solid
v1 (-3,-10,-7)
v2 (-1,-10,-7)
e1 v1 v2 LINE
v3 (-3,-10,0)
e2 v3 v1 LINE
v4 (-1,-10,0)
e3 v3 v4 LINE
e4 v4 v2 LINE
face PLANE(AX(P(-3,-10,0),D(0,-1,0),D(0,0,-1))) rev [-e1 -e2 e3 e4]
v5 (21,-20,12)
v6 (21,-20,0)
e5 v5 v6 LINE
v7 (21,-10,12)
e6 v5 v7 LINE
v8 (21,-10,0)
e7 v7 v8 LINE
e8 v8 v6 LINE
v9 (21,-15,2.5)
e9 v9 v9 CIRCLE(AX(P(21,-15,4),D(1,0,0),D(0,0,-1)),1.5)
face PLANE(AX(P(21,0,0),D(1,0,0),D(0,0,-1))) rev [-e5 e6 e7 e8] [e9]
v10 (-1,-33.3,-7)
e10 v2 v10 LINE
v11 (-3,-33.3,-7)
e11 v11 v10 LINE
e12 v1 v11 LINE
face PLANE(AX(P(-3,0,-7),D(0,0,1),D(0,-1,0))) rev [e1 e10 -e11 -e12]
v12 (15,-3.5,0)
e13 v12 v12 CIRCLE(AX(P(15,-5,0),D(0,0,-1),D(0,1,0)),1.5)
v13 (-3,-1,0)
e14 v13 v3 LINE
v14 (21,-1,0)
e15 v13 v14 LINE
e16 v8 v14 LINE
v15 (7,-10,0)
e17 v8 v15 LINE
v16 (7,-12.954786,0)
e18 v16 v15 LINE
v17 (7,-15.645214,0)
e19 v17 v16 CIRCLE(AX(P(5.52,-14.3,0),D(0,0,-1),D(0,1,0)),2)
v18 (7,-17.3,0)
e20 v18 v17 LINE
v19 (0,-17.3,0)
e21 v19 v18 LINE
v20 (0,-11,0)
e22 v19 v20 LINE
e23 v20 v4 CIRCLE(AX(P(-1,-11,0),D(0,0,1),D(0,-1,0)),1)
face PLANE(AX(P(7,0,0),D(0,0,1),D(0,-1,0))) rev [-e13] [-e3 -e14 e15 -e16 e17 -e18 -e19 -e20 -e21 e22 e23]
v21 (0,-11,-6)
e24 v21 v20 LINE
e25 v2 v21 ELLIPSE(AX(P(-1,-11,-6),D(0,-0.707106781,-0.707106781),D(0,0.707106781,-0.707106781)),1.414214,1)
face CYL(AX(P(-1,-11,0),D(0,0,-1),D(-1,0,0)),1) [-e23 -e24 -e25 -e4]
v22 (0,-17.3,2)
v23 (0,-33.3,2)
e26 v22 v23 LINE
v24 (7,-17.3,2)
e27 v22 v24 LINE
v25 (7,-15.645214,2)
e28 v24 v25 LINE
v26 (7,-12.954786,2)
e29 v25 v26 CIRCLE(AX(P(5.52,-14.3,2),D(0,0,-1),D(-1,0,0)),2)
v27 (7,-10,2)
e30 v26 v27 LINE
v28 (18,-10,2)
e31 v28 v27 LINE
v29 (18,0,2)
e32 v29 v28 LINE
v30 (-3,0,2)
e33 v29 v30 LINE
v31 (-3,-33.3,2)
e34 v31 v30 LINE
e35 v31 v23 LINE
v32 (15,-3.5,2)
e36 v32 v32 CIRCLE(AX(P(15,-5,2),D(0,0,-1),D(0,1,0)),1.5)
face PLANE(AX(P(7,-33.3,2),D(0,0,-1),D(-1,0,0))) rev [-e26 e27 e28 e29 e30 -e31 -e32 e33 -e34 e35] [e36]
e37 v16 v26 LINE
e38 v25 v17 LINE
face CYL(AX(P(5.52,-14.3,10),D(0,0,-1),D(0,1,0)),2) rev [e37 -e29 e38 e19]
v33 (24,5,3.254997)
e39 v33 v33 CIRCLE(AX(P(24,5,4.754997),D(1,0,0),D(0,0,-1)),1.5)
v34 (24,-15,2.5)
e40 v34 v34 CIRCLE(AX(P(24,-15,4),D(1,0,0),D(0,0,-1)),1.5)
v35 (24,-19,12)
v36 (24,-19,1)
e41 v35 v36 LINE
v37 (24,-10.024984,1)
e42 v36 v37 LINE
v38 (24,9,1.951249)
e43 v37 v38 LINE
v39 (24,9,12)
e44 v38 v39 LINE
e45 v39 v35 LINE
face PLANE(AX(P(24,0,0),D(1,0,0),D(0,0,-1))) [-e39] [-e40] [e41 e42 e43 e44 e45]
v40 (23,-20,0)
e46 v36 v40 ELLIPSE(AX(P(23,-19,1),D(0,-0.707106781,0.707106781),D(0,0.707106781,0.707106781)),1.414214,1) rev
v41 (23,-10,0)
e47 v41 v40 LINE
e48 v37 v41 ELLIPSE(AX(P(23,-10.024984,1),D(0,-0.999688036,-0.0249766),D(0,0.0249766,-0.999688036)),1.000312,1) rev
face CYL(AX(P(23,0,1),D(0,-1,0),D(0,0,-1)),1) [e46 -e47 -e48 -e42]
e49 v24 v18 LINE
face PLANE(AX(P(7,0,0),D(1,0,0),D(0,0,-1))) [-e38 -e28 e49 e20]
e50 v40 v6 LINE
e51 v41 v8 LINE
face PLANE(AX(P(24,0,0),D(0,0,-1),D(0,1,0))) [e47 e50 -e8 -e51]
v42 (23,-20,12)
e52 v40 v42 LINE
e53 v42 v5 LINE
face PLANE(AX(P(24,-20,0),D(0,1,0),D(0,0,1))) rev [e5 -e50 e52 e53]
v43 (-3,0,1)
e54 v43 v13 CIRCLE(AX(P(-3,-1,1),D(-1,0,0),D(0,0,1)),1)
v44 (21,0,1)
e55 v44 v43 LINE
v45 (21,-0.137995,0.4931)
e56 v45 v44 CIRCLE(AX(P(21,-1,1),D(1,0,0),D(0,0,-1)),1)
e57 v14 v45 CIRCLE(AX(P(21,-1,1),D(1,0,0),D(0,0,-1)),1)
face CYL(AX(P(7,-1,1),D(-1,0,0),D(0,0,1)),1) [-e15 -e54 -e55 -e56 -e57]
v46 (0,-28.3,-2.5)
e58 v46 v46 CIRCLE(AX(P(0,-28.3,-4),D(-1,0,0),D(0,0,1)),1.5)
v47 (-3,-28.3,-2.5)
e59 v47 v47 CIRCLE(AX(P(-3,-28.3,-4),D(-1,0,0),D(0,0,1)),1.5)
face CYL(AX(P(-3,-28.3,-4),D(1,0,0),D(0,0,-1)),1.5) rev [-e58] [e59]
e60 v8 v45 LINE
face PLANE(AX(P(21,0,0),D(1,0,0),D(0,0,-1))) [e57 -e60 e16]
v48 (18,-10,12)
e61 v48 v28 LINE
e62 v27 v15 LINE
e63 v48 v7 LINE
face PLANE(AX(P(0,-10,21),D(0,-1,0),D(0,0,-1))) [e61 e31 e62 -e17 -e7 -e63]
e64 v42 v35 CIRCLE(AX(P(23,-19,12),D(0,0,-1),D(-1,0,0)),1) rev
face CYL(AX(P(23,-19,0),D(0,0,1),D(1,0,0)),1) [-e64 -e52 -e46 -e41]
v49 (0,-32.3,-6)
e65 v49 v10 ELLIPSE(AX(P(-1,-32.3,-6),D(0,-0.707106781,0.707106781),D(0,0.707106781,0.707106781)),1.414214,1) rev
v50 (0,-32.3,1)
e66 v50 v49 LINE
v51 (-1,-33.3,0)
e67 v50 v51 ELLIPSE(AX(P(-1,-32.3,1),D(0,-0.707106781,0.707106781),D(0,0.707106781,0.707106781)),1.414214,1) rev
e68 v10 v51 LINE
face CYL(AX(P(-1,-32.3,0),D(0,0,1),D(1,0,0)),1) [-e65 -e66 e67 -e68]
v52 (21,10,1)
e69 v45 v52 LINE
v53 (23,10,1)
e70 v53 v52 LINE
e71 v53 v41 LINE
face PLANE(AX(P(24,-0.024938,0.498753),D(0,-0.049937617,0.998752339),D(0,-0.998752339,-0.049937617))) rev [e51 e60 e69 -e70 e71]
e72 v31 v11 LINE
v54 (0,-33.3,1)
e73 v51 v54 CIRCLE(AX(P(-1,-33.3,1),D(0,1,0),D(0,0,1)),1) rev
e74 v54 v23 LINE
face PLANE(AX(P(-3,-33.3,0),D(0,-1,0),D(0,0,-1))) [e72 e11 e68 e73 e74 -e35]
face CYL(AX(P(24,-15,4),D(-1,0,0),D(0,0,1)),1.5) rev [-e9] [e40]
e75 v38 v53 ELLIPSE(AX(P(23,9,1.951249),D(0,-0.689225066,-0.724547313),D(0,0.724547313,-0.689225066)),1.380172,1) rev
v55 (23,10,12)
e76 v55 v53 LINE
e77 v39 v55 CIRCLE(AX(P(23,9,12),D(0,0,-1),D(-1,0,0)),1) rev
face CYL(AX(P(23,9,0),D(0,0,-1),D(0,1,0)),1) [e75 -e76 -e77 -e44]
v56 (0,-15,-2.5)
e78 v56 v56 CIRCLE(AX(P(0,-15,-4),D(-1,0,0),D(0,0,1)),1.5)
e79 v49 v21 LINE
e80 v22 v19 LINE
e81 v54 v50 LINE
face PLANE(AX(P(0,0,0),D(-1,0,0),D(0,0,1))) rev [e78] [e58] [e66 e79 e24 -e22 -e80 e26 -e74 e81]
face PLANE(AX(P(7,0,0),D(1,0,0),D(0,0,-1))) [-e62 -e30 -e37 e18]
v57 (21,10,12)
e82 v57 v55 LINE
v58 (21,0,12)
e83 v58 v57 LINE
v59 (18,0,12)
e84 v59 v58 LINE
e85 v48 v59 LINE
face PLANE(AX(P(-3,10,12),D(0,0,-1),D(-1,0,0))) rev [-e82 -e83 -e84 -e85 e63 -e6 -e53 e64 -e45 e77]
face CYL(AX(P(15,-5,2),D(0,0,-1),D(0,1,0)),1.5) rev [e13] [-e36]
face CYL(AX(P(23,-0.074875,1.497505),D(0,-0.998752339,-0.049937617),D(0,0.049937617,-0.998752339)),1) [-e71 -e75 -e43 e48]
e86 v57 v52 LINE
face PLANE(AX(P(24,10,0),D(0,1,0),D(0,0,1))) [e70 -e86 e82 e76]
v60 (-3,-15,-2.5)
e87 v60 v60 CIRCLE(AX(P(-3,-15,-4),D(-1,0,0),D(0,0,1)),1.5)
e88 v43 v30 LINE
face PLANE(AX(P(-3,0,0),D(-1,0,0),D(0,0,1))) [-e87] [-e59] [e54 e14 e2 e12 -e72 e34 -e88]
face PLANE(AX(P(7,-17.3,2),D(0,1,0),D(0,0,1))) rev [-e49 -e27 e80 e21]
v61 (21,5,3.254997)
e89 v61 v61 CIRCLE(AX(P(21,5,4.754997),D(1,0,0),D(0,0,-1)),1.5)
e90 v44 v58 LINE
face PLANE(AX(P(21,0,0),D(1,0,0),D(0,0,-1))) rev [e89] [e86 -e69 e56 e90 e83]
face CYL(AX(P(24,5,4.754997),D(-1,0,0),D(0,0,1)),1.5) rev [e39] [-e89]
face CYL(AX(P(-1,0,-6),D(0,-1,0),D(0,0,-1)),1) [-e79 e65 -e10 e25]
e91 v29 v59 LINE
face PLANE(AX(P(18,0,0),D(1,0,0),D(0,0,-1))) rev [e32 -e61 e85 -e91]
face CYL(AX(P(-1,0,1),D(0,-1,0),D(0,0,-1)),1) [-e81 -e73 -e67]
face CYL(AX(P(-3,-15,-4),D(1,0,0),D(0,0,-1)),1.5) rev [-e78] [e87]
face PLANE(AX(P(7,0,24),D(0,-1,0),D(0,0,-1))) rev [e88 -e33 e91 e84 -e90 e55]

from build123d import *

# Parameters (mm, degrees)
CROQUIS1_W              = 24
CROQUIS1_H              = 33.3
SALIENTE_EXTRUIR2_DEPTH = 7
CROQUIS3_W              = 4
CROQUIS3_H              = 19
CORTAR_EXTRUIR1_DEPTH   = 42.640004803
CROQUIS7_R              = 1.5
SALIENTE_EXTRUIR3_DEPTH = 3
CROQUIS8_W              = 18
CROQUIS8_H              = 10
CROQUIS8_R              = 1.5
SALIENTE_EXTRUIR5_DEPTH = 3
SALIENTE_EXTRUIR6_START = -2
CROQUIS9_W              = 18
CROQUIS9_H              = 10
CROQUIS9_R              = 1.5
SALIENTE_EXTRUIR6_DEPTH = 2
CROQUIS10_W             = 24
CROQUIS10_H             = 10
SALIENTE_EXTRUIR7_DEPTH = 3
CROQUIS11_W             = 19
CROQUIS11_H             = 38
CORTAR_EXTRUIR5_DEPTH   = 57.986752847
CROQUIS15_W             = 7
CROQUIS15_H             = 10
CORTAR_EXTRUIR8_DEPTH   = 59.004223984
CROQUIS16_W             = 7
CROQUIS16_H             = 16
CORTAR_EXTRUIR9_DEPTH   = 2
CROQUIS18_R             = 1.5
CROQUIS18_W             = 24
CROQUIS18_H             = 10
SALIENTE_EXTRUIR8_DEPTH = 3
REDONDEO1_R             = 1
CROQUIS19_W             = 27
CROQUIS19_H             = 19
CORTAR_EXTRUIR11_DEPTH  = 67.973800848
CROQUIS21_R             = 2
CORTAR_EXTRUIR12_DEPTH  = 10
CROQUIS22_W             = 12
CROQUIS22_H             = 11
CORTAR_EXTRUIR13_DEPTH  = 52.792760112


with BuildPart() as part:
    # Croquis1 → Saliente-Extruir2 (new body)
    with BuildSketch(Plane(origin=(0, 0, 0), x_dir=(0, 0, -1), z_dir=(1, 0, 0))):
        with Locations((-12, -16.65)):
            Rectangle(CROQUIS1_W, CROQUIS1_H)
    extrude(amount=SALIENTE_EXTRUIR2_DEPTH)

    # Croquis3 → Cortar-Extruir1 (cut, through all)
    with BuildSketch(Plane(origin=(0, 0, 0), x_dir=(1, 0, 0), z_dir=(0, 1, 0))):
        with Locations((5, -11.5)):
            Rectangle(CROQUIS3_W, CROQUIS3_H)
    extrude(amount=-CORTAR_EXTRUIR1_DEPTH, mode=Mode.SUBTRACT)



with BuildPart() as body_2:
    # Croquis7 → Saliente-Extruir3 (new body)
    with BuildSketch(Plane.ZY):
        Polygon((-7, 0), (-7, -33.3), (0, -33.3), (0, -44.3), (24, -44.3), (24, -33.3), (31, -33.3), (31, 0), align=None)
        with Locations((-4, -28.3)):
            Circle(CROQUIS7_R, mode=Mode.SUBTRACT)
        with Locations((-4, -15)):
            Circle(CROQUIS7_R, mode=Mode.SUBTRACT)
        with Locations((28, -15)):
            Circle(CROQUIS7_R, mode=Mode.SUBTRACT)
        with Locations((28, -28.3)):
            Circle(CROQUIS7_R, mode=Mode.SUBTRACT)
        with Locations((20, -40.3)):
            Circle(CROQUIS7_R, mode=Mode.SUBTRACT)
        with Locations((4, -40.3)):
            Circle(CROQUIS7_R, mode=Mode.SUBTRACT)
    extrude(amount=SALIENTE_EXTRUIR3_DEPTH)


with BuildPart() as part_1:
    add(part.part)

    add(body_2.part)  # Saliente-Extruir5 merges body 2
    # Croquis8 → Saliente-Extruir5 (add)
    with BuildSketch(Plane.XY.offset(24)):
        with Locations((9, -5)):
            Rectangle(CROQUIS8_W, CROQUIS8_H)
        with Locations((15, -5)):
            Circle(CROQUIS8_R, mode=Mode.SUBTRACT)
        with Locations((3, -5)):
            Circle(CROQUIS8_R, mode=Mode.SUBTRACT)
    extrude(amount=-SALIENTE_EXTRUIR5_DEPTH)

    # Croquis9 → Saliente-Extruir6 (add)
    with BuildSketch(Plane(origin=(0, 0, 0), x_dir=(-1, 0, 0), z_dir=(0, 0, -1)).offset(SALIENTE_EXTRUIR6_START)):
        with Locations((-9, -5)):
            Rectangle(CROQUIS9_W, CROQUIS9_H)
        with Locations(Location((-15, -5, 0), (0, 0, 180))):
            Circle(CROQUIS9_R, mode=Mode.SUBTRACT)
    extrude(amount=SALIENTE_EXTRUIR6_DEPTH)

    # Croquis10 → Saliente-Extruir7 (add)
    with BuildSketch(Plane(origin=(18, 0, 0), x_dir=(0, 0, -1), z_dir=(1, 0, 0))):
        with Locations((-12, -5)):
            Rectangle(CROQUIS10_W, CROQUIS10_H)
    extrude(amount=SALIENTE_EXTRUIR7_DEPTH)

    # Croquis11 → Cortar-Extruir5 (cut, through all)
    with BuildSketch(Plane(origin=(3, 0, 0), x_dir=(0, 0, -1), z_dir=(1, 0, 0))):
        with Locations((-11.5, -19)):
            Rectangle(CROQUIS11_W, CROQUIS11_H)
    extrude(amount=-CORTAR_EXTRUIR5_DEPTH, mode=Mode.SUBTRACT)

    # Croquis15 → Cortar-Extruir8 (cut, through all)
    with BuildSketch(Plane(origin=(0, 0, 0), x_dir=(0, 0, -1), z_dir=(1, 0, 0))):
        with Locations((-27.5, -5)):
            Rectangle(CROQUIS15_W, CROQUIS15_H)
        with Locations((3.5, -5)):
            Rectangle(CROQUIS15_W, CROQUIS15_H)
    extrude(amount=-CORTAR_EXTRUIR8_DEPTH, mode=Mode.SUBTRACT)

    # Croquis16 → Cortar-Extruir9 (cut)
    with BuildSketch(Plane(origin=(0, 0, 0), x_dir=(-1, 0, 0), z_dir=(0, 0, -1))):
        with Locations((-3.5, -25.3)):
            Rectangle(CROQUIS16_W, CROQUIS16_H)
    extrude(amount=-CORTAR_EXTRUIR9_DEPTH, mode=Mode.SUBTRACT)

    # Croquis18 → Saliente-Extruir8 (add)
    # profile 1 of 2: a face of its own
    with BuildSketch(Plane(origin=(21, 0, 0), x_dir=(0, 0, -1), z_dir=(1, 0, 0))):
        Polygon((-24, 10), (-24, -10), (0, -10), (-1, 10), align=None)
        with Locations((-20, 5)):
            Circle(CROQUIS18_R, mode=Mode.SUBTRACT)
        with Locations((-4.754996879, 5)):
            Circle(CROQUIS18_R, mode=Mode.SUBTRACT)
    # profile 2 of 2: a face of its own
    with BuildSketch(Plane(origin=(21, 0, 0), x_dir=(0, 0, -1), z_dir=(1, 0, 0))):
        with Locations((-12, -15)):
            Rectangle(CROQUIS18_W, CROQUIS18_H)
        with Locations((-20, -15)):
            Circle(CROQUIS18_R, mode=Mode.SUBTRACT)
        with Locations((-4, -15)):
            Circle(CROQUIS18_R, mode=Mode.SUBTRACT)
    extrude(amount=SALIENTE_EXTRUIR8_DEPTH)

    # Redondeo1
    # the kernel refuses this fillet: 1 mm, written as the material it takes off along each edge
    with BuildSketch(Plane(origin=(0, -33.3, 31), x_dir=(0, 0, -1), z_dir=(0, 1, 0)), Plane(origin=(0, -10, -7), x_dir=(0, 0, 1), z_dir=(0, -1, 0))) as redondeo1_piece_1:
        with BuildLine():
            CenterArc((REDONDEO1_R, REDONDEO1_R), REDONDEO1_R, 180, 90)
            Line((0, REDONDEO1_R), (-REDONDEO1_R * 0.02, REDONDEO1_R))
            Line((-REDONDEO1_R * 0.02, REDONDEO1_R), (-REDONDEO1_R * 0.02, -REDONDEO1_R * 0.02))
            Line((-REDONDEO1_R * 0.02, -REDONDEO1_R * 0.02), (REDONDEO1_R, -REDONDEO1_R * 0.02))
            Line((REDONDEO1_R, -REDONDEO1_R * 0.02), (REDONDEO1_R, 0))
        make_face()
    extrude(amount=23.3, mode=Mode.SUBTRACT)
    with BuildSketch(Plane(origin=(0, -10, 24), x_dir=(-1, 0, 0), z_dir=(0, 0, 1)), Plane(origin=(0, -10, -7), x_dir=(-1, 0, 0), z_dir=(0, 0, 1)), Plane(origin=(0, -33.3, 24), x_dir=(0, 1, 0), z_dir=(0, 0, 1)), Plane(origin=(0, -33.3, -7), x_dir=(0, 1, 0), z_dir=(0, 0, 1))) as redondeo1_piece_2:
        with BuildLine():
            CenterArc((REDONDEO1_R, REDONDEO1_R), REDONDEO1_R, 180, 90)
            Line((0, REDONDEO1_R), (-REDONDEO1_R * 0.02, REDONDEO1_R))
            Line((-REDONDEO1_R * 0.02, REDONDEO1_R), (-REDONDEO1_R * 0.02, -REDONDEO1_R * 0.02))
            Line((-REDONDEO1_R * 0.02, -REDONDEO1_R * 0.02), (REDONDEO1_R, -REDONDEO1_R * 0.02))
            Line((REDONDEO1_R, -REDONDEO1_R * 0.02), (REDONDEO1_R, 0))
        make_face()
    extrude(amount=7, mode=Mode.SUBTRACT)
    with BuildSketch(Plane(origin=(24, -20, 24), x_dir=(-1, 0, 0), z_dir=(0, 1, 0))) as redondeo1_piece_3:
        with BuildLine():
            CenterArc((REDONDEO1_R, -REDONDEO1_R), REDONDEO1_R, 90, 90)
            Line((0, -REDONDEO1_R), (-REDONDEO1_R * 0.02, -REDONDEO1_R))
            Line((-REDONDEO1_R * 0.02, -REDONDEO1_R), (-REDONDEO1_R * 0.02, REDONDEO1_R * 0.02))
            Line((-REDONDEO1_R * 0.02, REDONDEO1_R * 0.02), (REDONDEO1_R, REDONDEO1_R * 0.02))
            Line((REDONDEO1_R, REDONDEO1_R * 0.02), (REDONDEO1_R, 0))
        make_face()
    extrude(amount=30, mode=Mode.SUBTRACT)
    with BuildSketch(Plane(origin=(24, -20, 0), x_dir=(0, 0, 1), z_dir=(0, 1, 0))) as redondeo1_piece_4_section:
        with BuildLine():
            CenterArc((REDONDEO1_R, -REDONDEO1_R), REDONDEO1_R, 90, 90)
            Line((0, -REDONDEO1_R), (-REDONDEO1_R * 0.02, -REDONDEO1_R))
            Line((-REDONDEO1_R * 0.02, -REDONDEO1_R), (-REDONDEO1_R * 0.02, REDONDEO1_R * 0.02))
            Line((-REDONDEO1_R * 0.02, REDONDEO1_R * 0.02), (REDONDEO1_R, REDONDEO1_R * 0.02))
            Line((REDONDEO1_R, REDONDEO1_R * 0.02), (REDONDEO1_R, 0))
        make_face()
    redondeo1_piece_4 = extrude(amount=12.5, mode=Mode.PRIVATE)
    redondeo1_piece_4 = split(redondeo1_piece_4, bisect_by=Plane(origin=(23.783903018, -14.02846616, -0.201423308), z_dir=(0, -0.049937616943892635, 0.9987523388778446)), keep=Keep.TOP, mode=Mode.PRIVATE)
    add(redondeo1_piece_4, mode=Mode.SUBTRACT)
    with BuildSketch(Plane(origin=(24, 10, -1.5), x_dir=(-1, 0, 0), z_dir=(0, 0, 1))) as redondeo1_piece_5_section:
        with BuildLine():
            CenterArc((REDONDEO1_R, REDONDEO1_R), REDONDEO1_R, 180, 90)
            Line((0, REDONDEO1_R), (-REDONDEO1_R * 0.02, REDONDEO1_R))
            Line((-REDONDEO1_R * 0.02, REDONDEO1_R), (-REDONDEO1_R * 0.02, -REDONDEO1_R * 0.02))
            Line((-REDONDEO1_R * 0.02, -REDONDEO1_R * 0.02), (REDONDEO1_R, -REDONDEO1_R * 0.02))
            Line((REDONDEO1_R, -REDONDEO1_R * 0.02), (REDONDEO1_R, 0))
        make_face()
    redondeo1_piece_5 = extrude(amount=25.5, mode=Mode.PRIVATE)
    redondeo1_piece_5 = split(redondeo1_piece_5, bisect_by=Plane(origin=(23.773664545, 10.347352398, 1.01736762), z_dir=(0, -0.049937616943892635, 0.9987523388778446)), keep=Keep.TOP, mode=Mode.PRIVATE)
    add(redondeo1_piece_5, mode=Mode.SUBTRACT)
    with BuildSketch(Plane(origin=(24, -20, 24), x_dir=(0, 1, 0), z_dir=(0, 0, -1)), Plane(origin=(-3, 0, 24), x_dir=(0, 0, -1), z_dir=(1, 0, 0)), Plane(origin=(21, 0, 0), x_dir=(0, 0, 1), z_dir=(-1, 0, 0))) as redondeo1_piece_6:
        with BuildLine():
            CenterArc((REDONDEO1_R, -REDONDEO1_R), REDONDEO1_R, 90, 90)
            Line((0, -REDONDEO1_R), (-REDONDEO1_R * 0.02, -REDONDEO1_R))
            Line((-REDONDEO1_R * 0.02, -REDONDEO1_R), (-REDONDEO1_R * 0.02, REDONDEO1_R * 0.02))
            Line((-REDONDEO1_R * 0.02, REDONDEO1_R * 0.02), (REDONDEO1_R, REDONDEO1_R * 0.02))
            Line((REDONDEO1_R, REDONDEO1_R * 0.02), (REDONDEO1_R, 0))
        make_face()
    extrude(amount=24, mode=Mode.SUBTRACT)
    with BuildSketch(Plane(origin=(24, -12.496880847, -0.124844042), x_dir=(-1, 0, 0), z_dir=(0, 0.9987523388778446, 0.049937616943892635))) as redondeo1_piece_7_section:
        with BuildLine():
            CenterArc((REDONDEO1_R, REDONDEO1_R), REDONDEO1_R, 180, 90)
            Line((0, REDONDEO1_R), (-REDONDEO1_R * 0.02, REDONDEO1_R))
            Line((-REDONDEO1_R * 0.02, REDONDEO1_R), (-REDONDEO1_R * 0.02, -REDONDEO1_R * 0.02))
            Line((-REDONDEO1_R * 0.02, -REDONDEO1_R * 0.02), (REDONDEO1_R, -REDONDEO1_R * 0.02))
            Line((REDONDEO1_R, -REDONDEO1_R * 0.02), (REDONDEO1_R, 0))
        make_face()
    redondeo1_piece_7 = extrude(amount=25.024984395, mode=Mode.PRIVATE)
    redondeo1_piece_7 = split(redondeo1_piece_7, bisect_by=Plane(origin=(23.779237021, -0.936247577, 0), z_dir=(0, 0, 1)), keep=Keep.TOP, mode=Mode.PRIVATE)
    redondeo1_piece_7 = split(redondeo1_piece_7, bisect_by=Plane(origin=(23.779237021, 10, 0.686324779), z_dir=(0, -1, 0)), keep=Keep.TOP, mode=Mode.PRIVATE)
    add(redondeo1_piece_7, mode=Mode.SUBTRACT)
    with BuildSketch(Plane(origin=(7, -33.3, 24), x_dir=(-1, 0, 0), z_dir=(0, 1, 0))) as redondeo1_piece_8:
        with BuildLine():
            CenterArc((REDONDEO1_R, -REDONDEO1_R), REDONDEO1_R, 90, 90)
            Line((0, -REDONDEO1_R), (-REDONDEO1_R * 0.02, -REDONDEO1_R))
            Line((-REDONDEO1_R * 0.02, -REDONDEO1_R), (-REDONDEO1_R * 0.02, REDONDEO1_R * 0.02))
            Line((-REDONDEO1_R * 0.02, REDONDEO1_R * 0.02), (REDONDEO1_R, REDONDEO1_R * 0.02))
            Line((REDONDEO1_R, REDONDEO1_R * 0.02), (REDONDEO1_R, 0))
        make_face()
    extrude(amount=23.3, mode=Mode.SUBTRACT)
    with BuildSketch(Plane(origin=(7, -10, 24), x_dir=(0, 1, 0), z_dir=(1, 0, 0))) as redondeo1_piece_9:
        with BuildLine():
            CenterArc((REDONDEO1_R, -REDONDEO1_R), REDONDEO1_R, 90, 90)
            Line((0, -REDONDEO1_R), (-REDONDEO1_R * 0.02, -REDONDEO1_R))
            Line((-REDONDEO1_R * 0.02, -REDONDEO1_R), (-REDONDEO1_R * 0.02, REDONDEO1_R * 0.02))
            Line((-REDONDEO1_R * 0.02, REDONDEO1_R * 0.02), (REDONDEO1_R, REDONDEO1_R * 0.02))
            Line((REDONDEO1_R, REDONDEO1_R * 0.02), (REDONDEO1_R, 0))
        make_face()
    extrude(amount=14, mode=Mode.SUBTRACT)
    with BuildSketch(Plane(origin=(0, -33.3, 0), x_dir=(0, 0, 1), z_dir=(0, -1, 0))) as redondeo1_piece_10:
        with BuildLine():
            CenterArc((REDONDEO1_R, REDONDEO1_R), REDONDEO1_R, 180, 90)
            Line((0, REDONDEO1_R), (-REDONDEO1_R * 0.02, REDONDEO1_R))
            Line((-REDONDEO1_R * 0.02, REDONDEO1_R), (-REDONDEO1_R * 0.02, -REDONDEO1_R * 0.02))
            Line((-REDONDEO1_R * 0.02, -REDONDEO1_R * 0.02), (REDONDEO1_R, -REDONDEO1_R * 0.02))
            Line((REDONDEO1_R, -REDONDEO1_R * 0.02), (REDONDEO1_R, 0))
        make_face()
    extrude(amount=11, mode=Mode.SUBTRACT)
    with BuildSketch(Plane(origin=(0, -44.3, 0), x_dir=(0, 1, 0), z_dir=(0, 0, 1))) as redondeo1_piece_11:
        with BuildLine():
            CenterArc((REDONDEO1_R, REDONDEO1_R), REDONDEO1_R, 180, 90)
            Line((0, REDONDEO1_R), (-REDONDEO1_R * 0.02, REDONDEO1_R))
            Line((-REDONDEO1_R * 0.02, REDONDEO1_R), (-REDONDEO1_R * 0.02, -REDONDEO1_R * 0.02))
            Line((-REDONDEO1_R * 0.02, -REDONDEO1_R * 0.02), (REDONDEO1_R, -REDONDEO1_R * 0.02))
            Line((REDONDEO1_R, -REDONDEO1_R * 0.02), (REDONDEO1_R, 0))
        make_face()
    extrude(amount=24, mode=Mode.SUBTRACT)
    with BuildSketch(Plane(origin=(0, -35.8, 31), x_dir=(0, 0, -1), z_dir=(0, 1, 0))) as redondeo1_piece_12a_section:
        with BuildLine():
            CenterArc((REDONDEO1_R, REDONDEO1_R), REDONDEO1_R, 180, 90)
            Line((0, REDONDEO1_R), (-REDONDEO1_R * 0.02, REDONDEO1_R))
            Line((-REDONDEO1_R * 0.02, REDONDEO1_R), (-REDONDEO1_R * 0.02, -REDONDEO1_R * 0.02))
            Line((-REDONDEO1_R * 0.02, -REDONDEO1_R * 0.02), (REDONDEO1_R, -REDONDEO1_R * 0.02))
            Line((REDONDEO1_R, -REDONDEO1_R * 0.02), (REDONDEO1_R, 0))
        make_face()
    redondeo1_piece_12a = extrude(amount=25.8, mode=Mode.PRIVATE)
    redondeo1_piece_12a = split(redondeo1_piece_12a, bisect_by=Plane(origin=(-0.226395114, -33.3, 30.773604886), z_dir=(0, -1, 0)), keep=Keep.TOP, mode=Mode.PRIVATE)
    with BuildSketch(Plane(origin=(0, -33.3, 24), x_dir=(0, 1, 0), z_dir=(0, 0, 1))) as redondeo1_piece_12b_section:
        with BuildLine():
            CenterArc((REDONDEO1_R, REDONDEO1_R), REDONDEO1_R, 180, 90)
            Line((0, REDONDEO1_R), (-REDONDEO1_R * 0.02, REDONDEO1_R))
            Line((-REDONDEO1_R * 0.02, REDONDEO1_R), (-REDONDEO1_R * 0.02, -REDONDEO1_R * 0.02))
            Line((-REDONDEO1_R * 0.02, -REDONDEO1_R * 0.02), (REDONDEO1_R, -REDONDEO1_R * 0.02))
            Line((REDONDEO1_R, -REDONDEO1_R * 0.02), (REDONDEO1_R, 0))
        make_face()
    redondeo1_piece_12b = extrude(amount=9.5, mode=Mode.PRIVATE)
    redondeo1_piece_12b = split(redondeo1_piece_12b, bisect_by=Plane(origin=(-0.226395114, -33.073604886, 31), z_dir=(0, 0, 1)), keep=Keep.TOP, mode=Mode.PRIVATE)
    redondeo1_piece_12 = redondeo1_piece_12a & redondeo1_piece_12b
    add(redondeo1_piece_12, mode=Mode.SUBTRACT)
    with BuildSketch(Plane(origin=(0, -10, 24), x_dir=(-1, 0, 0), z_dir=(0, 0, 1))) as redondeo1_piece_13a_section:
        with BuildLine():
            CenterArc((REDONDEO1_R, REDONDEO1_R), REDONDEO1_R, 180, 90)
            Line((0, REDONDEO1_R), (-REDONDEO1_R * 0.02, REDONDEO1_R))
            Line((-REDONDEO1_R * 0.02, REDONDEO1_R), (-REDONDEO1_R * 0.02, -REDONDEO1_R * 0.02))
            Line((-REDONDEO1_R * 0.02, -REDONDEO1_R * 0.02), (REDONDEO1_R, -REDONDEO1_R * 0.02))
            Line((REDONDEO1_R, -REDONDEO1_R * 0.02), (REDONDEO1_R, 0))
        make_face()
    redondeo1_piece_13a = extrude(amount=9.5, mode=Mode.PRIVATE)
    redondeo1_piece_13a = split(redondeo1_piece_13a, bisect_by=Plane(origin=(-0.226395114, -10.226395114, 31), z_dir=(0, 0, 1)), keep=Keep.TOP, mode=Mode.PRIVATE)
    with BuildSketch(Plane(origin=(0, -33.3, 31), x_dir=(0, 0, -1), z_dir=(0, 1, 0))) as redondeo1_piece_13b_section:
        with BuildLine():
            CenterArc((REDONDEO1_R, REDONDEO1_R), REDONDEO1_R, 180, 90)
            Line((0, REDONDEO1_R), (-REDONDEO1_R * 0.02, REDONDEO1_R))
            Line((-REDONDEO1_R * 0.02, REDONDEO1_R), (-REDONDEO1_R * 0.02, -REDONDEO1_R * 0.02))
            Line((-REDONDEO1_R * 0.02, -REDONDEO1_R * 0.02), (REDONDEO1_R, -REDONDEO1_R * 0.02))
            Line((REDONDEO1_R, -REDONDEO1_R * 0.02), (REDONDEO1_R, 0))
        make_face()
    redondeo1_piece_13b = extrude(amount=25.8, mode=Mode.PRIVATE)
    redondeo1_piece_13b = split(redondeo1_piece_13b, bisect_by=Plane(origin=(-0.226395114, -10, 30.773604886), z_dir=(0, 1, 0)), keep=Keep.TOP, mode=Mode.PRIVATE)
    redondeo1_piece_13 = redondeo1_piece_13a & redondeo1_piece_13b
    add(redondeo1_piece_13, mode=Mode.SUBTRACT)
    with BuildSketch(Plane(origin=(0, -10, -9.5), x_dir=(-1, 0, 0), z_dir=(0, 0, 1))) as redondeo1_piece_14a_section:
        with BuildLine():
            CenterArc((REDONDEO1_R, REDONDEO1_R), REDONDEO1_R, 180, 90)
            Line((0, REDONDEO1_R), (-REDONDEO1_R * 0.02, REDONDEO1_R))
            Line((-REDONDEO1_R * 0.02, REDONDEO1_R), (-REDONDEO1_R * 0.02, -REDONDEO1_R * 0.02))
            Line((-REDONDEO1_R * 0.02, -REDONDEO1_R * 0.02), (REDONDEO1_R, -REDONDEO1_R * 0.02))
            Line((REDONDEO1_R, -REDONDEO1_R * 0.02), (REDONDEO1_R, 0))
        make_face()
    redondeo1_piece_14a = extrude(amount=9.5, mode=Mode.PRIVATE)
    redondeo1_piece_14a = split(redondeo1_piece_14a, bisect_by=Plane(origin=(-0.226395114, -10.226395114, -7), z_dir=(0, 0, -1)), keep=Keep.TOP, mode=Mode.PRIVATE)
    with BuildSketch(Plane(origin=(0, -7.5, -7), x_dir=(0, 0, 1), z_dir=(0, -1, 0))) as redondeo1_piece_14b_section:
        with BuildLine():
            CenterArc((REDONDEO1_R, REDONDEO1_R), REDONDEO1_R, 180, 90)
            Line((0, REDONDEO1_R), (-REDONDEO1_R * 0.02, REDONDEO1_R))
            Line((-REDONDEO1_R * 0.02, REDONDEO1_R), (-REDONDEO1_R * 0.02, -REDONDEO1_R * 0.02))
            Line((-REDONDEO1_R * 0.02, -REDONDEO1_R * 0.02), (REDONDEO1_R, -REDONDEO1_R * 0.02))
            Line((REDONDEO1_R, -REDONDEO1_R * 0.02), (REDONDEO1_R, 0))
        make_face()
    redondeo1_piece_14b = extrude(amount=25.8, mode=Mode.PRIVATE)
    redondeo1_piece_14b = split(redondeo1_piece_14b, bisect_by=Plane(origin=(-0.226395114, -10, -6.773604886), z_dir=(0, 1, 0)), keep=Keep.TOP, mode=Mode.PRIVATE)
    redondeo1_piece_14 = redondeo1_piece_14a & redondeo1_piece_14b
    add(redondeo1_piece_14, mode=Mode.SUBTRACT)
    with BuildSketch(Plane(origin=(0, -10, -7), x_dir=(0, 0, 1), z_dir=(0, -1, 0))) as redondeo1_piece_15a_section:
        with BuildLine():
            CenterArc((REDONDEO1_R, REDONDEO1_R), REDONDEO1_R, 180, 90)
            Line((0, REDONDEO1_R), (-REDONDEO1_R * 0.02, REDONDEO1_R))
            Line((-REDONDEO1_R * 0.02, REDONDEO1_R), (-REDONDEO1_R * 0.02, -REDONDEO1_R * 0.02))
            Line((-REDONDEO1_R * 0.02, -REDONDEO1_R * 0.02), (REDONDEO1_R, -REDONDEO1_R * 0.02))
            Line((REDONDEO1_R, -REDONDEO1_R * 0.02), (REDONDEO1_R, 0))
        make_face()
    redondeo1_piece_15a = extrude(amount=25.8, mode=Mode.PRIVATE)
    redondeo1_piece_15a = split(redondeo1_piece_15a, bisect_by=Plane(origin=(-0.226395114, -33.3, -6.773604886), z_dir=(0, -1, 0)), keep=Keep.TOP, mode=Mode.PRIVATE)
    with BuildSketch(Plane(origin=(0, -33.3, -9.5), x_dir=(0, 1, 0), z_dir=(0, 0, 1))) as redondeo1_piece_15b_section:
        with BuildLine():
            CenterArc((REDONDEO1_R, REDONDEO1_R), REDONDEO1_R, 180, 90)
            Line((0, REDONDEO1_R), (-REDONDEO1_R * 0.02, REDONDEO1_R))
            Line((-REDONDEO1_R * 0.02, REDONDEO1_R), (-REDONDEO1_R * 0.02, -REDONDEO1_R * 0.02))
            Line((-REDONDEO1_R * 0.02, -REDONDEO1_R * 0.02), (REDONDEO1_R, -REDONDEO1_R * 0.02))
            Line((REDONDEO1_R, -REDONDEO1_R * 0.02), (REDONDEO1_R, 0))
        make_face()
    redondeo1_piece_15b = extrude(amount=9.5, mode=Mode.PRIVATE)
    redondeo1_piece_15b = split(redondeo1_piece_15b, bisect_by=Plane(origin=(-0.226395114, -33.073604886, -7), z_dir=(0, 0, -1)), keep=Keep.TOP, mode=Mode.PRIVATE)
    redondeo1_piece_15 = redondeo1_piece_15a & redondeo1_piece_15b
    add(redondeo1_piece_15, mode=Mode.SUBTRACT)
    with BuildSketch(Plane(origin=(24, -22.5, 24), x_dir=(-1, 0, 0), z_dir=(0, 1, 0))) as redondeo1_piece_16a_section:
        with BuildLine():
            CenterArc((REDONDEO1_R, -REDONDEO1_R), REDONDEO1_R, 90, 90)
            Line((0, -REDONDEO1_R), (-REDONDEO1_R * 0.02, -REDONDEO1_R))
            Line((-REDONDEO1_R * 0.02, -REDONDEO1_R), (-REDONDEO1_R * 0.02, REDONDEO1_R * 0.02))
            Line((-REDONDEO1_R * 0.02, REDONDEO1_R * 0.02), (REDONDEO1_R, REDONDEO1_R * 0.02))
            Line((REDONDEO1_R, REDONDEO1_R * 0.02), (REDONDEO1_R, 0))
        make_face()
    redondeo1_piece_16a = extrude(amount=32.5, mode=Mode.PRIVATE)
    redondeo1_piece_16a = split(redondeo1_piece_16a, bisect_by=Plane(origin=(23.773604886, -20, 23.773604886), z_dir=(0, -1, 0)), keep=Keep.TOP, mode=Mode.PRIVATE)
    with BuildSketch(Plane(origin=(24, -20, 26.5), x_dir=(0, 1, 0), z_dir=(0, 0, -1))) as redondeo1_piece_16b_section:
        with BuildLine():
            CenterArc((REDONDEO1_R, -REDONDEO1_R), REDONDEO1_R, 90, 90)
            Line((0, -REDONDEO1_R), (-REDONDEO1_R * 0.02, -REDONDEO1_R))
            Line((-REDONDEO1_R * 0.02, -REDONDEO1_R), (-REDONDEO1_R * 0.02, REDONDEO1_R * 0.02))
            Line((-REDONDEO1_R * 0.02, REDONDEO1_R * 0.02), (REDONDEO1_R, REDONDEO1_R * 0.02))
            Line((REDONDEO1_R, REDONDEO1_R * 0.02), (REDONDEO1_R, 0))
        make_face()
    redondeo1_piece_16b = extrude(amount=26.5, mode=Mode.PRIVATE)
    redondeo1_piece_16b = split(redondeo1_piece_16b, bisect_by=Plane(origin=(23.773604886, -19.773604886, 24), z_dir=(0, 0, 1)), keep=Keep.TOP, mode=Mode.PRIVATE)
    redondeo1_piece_16 = redondeo1_piece_16a & redondeo1_piece_16b
    add(redondeo1_piece_16, mode=Mode.SUBTRACT)
    with BuildSketch(Plane(origin=(24, -20, 24), x_dir=(-1, 0, 0), z_dir=(0, 1, 0))) as redondeo1_piece_17a_section:
        with BuildLine():
            CenterArc((REDONDEO1_R, -REDONDEO1_R), REDONDEO1_R, 90, 90)
            Line((0, -REDONDEO1_R), (-REDONDEO1_R * 0.02, -REDONDEO1_R))
            Line((-REDONDEO1_R * 0.02, -REDONDEO1_R), (-REDONDEO1_R * 0.02, REDONDEO1_R * 0.02))
            Line((-REDONDEO1_R * 0.02, REDONDEO1_R * 0.02), (REDONDEO1_R, REDONDEO1_R * 0.02))
            Line((REDONDEO1_R, REDONDEO1_R * 0.02), (REDONDEO1_R, 0))
        make_face()
    redondeo1_piece_17a = extrude(amount=32.5, mode=Mode.PRIVATE)
    redondeo1_piece_17a = split(redondeo1_piece_17a, bisect_by=Plane(origin=(23.773604886, 10, 23.773604886), z_dir=(0, 1, 0)), keep=Keep.TOP, mode=Mode.PRIVATE)
    with BuildSketch(Plane(origin=(24, 10, -1.5), x_dir=(-1, 0, 0), z_dir=(0, 0, 1))) as redondeo1_piece_17b_section:
        with BuildLine():
            CenterArc((REDONDEO1_R, REDONDEO1_R), REDONDEO1_R, 180, 90)
            Line((0, REDONDEO1_R), (-REDONDEO1_R * 0.02, REDONDEO1_R))
            Line((-REDONDEO1_R * 0.02, REDONDEO1_R), (-REDONDEO1_R * 0.02, -REDONDEO1_R * 0.02))
            Line((-REDONDEO1_R * 0.02, -REDONDEO1_R * 0.02), (REDONDEO1_R, -REDONDEO1_R * 0.02))
            Line((REDONDEO1_R, -REDONDEO1_R * 0.02), (REDONDEO1_R, 0))
        make_face()
    redondeo1_piece_17b = extrude(amount=28, mode=Mode.PRIVATE)
    redondeo1_piece_17b = split(redondeo1_piece_17b, bisect_by=Plane(origin=(23.773604886, 9.773604886, 24), z_dir=(0, 0, 1)), keep=Keep.TOP, mode=Mode.PRIVATE)
    redondeo1_piece_17 = redondeo1_piece_17a & redondeo1_piece_17b
    add(redondeo1_piece_17, mode=Mode.SUBTRACT)
    with BuildSketch(Plane(origin=(24, -20, 24), x_dir=(0, 1, 0), z_dir=(0, 0, -1))) as redondeo1_piece_18a_section:
        with BuildLine():
            CenterArc((REDONDEO1_R, -REDONDEO1_R), REDONDEO1_R, 90, 90)
            Line((0, -REDONDEO1_R), (-REDONDEO1_R * 0.02, -REDONDEO1_R))
            Line((-REDONDEO1_R * 0.02, -REDONDEO1_R), (-REDONDEO1_R * 0.02, REDONDEO1_R * 0.02))
            Line((-REDONDEO1_R * 0.02, REDONDEO1_R * 0.02), (REDONDEO1_R, REDONDEO1_R * 0.02))
            Line((REDONDEO1_R, REDONDEO1_R * 0.02), (REDONDEO1_R, 0))
        make_face()
    redondeo1_piece_18a = extrude(amount=26.5, mode=Mode.PRIVATE)
    redondeo1_piece_18a = split(redondeo1_piece_18a, bisect_by=Plane(origin=(23.773604886, -19.773604886, 0), z_dir=(0, 0, -1)), keep=Keep.TOP, mode=Mode.PRIVATE)
    with BuildSketch(Plane(origin=(24, -22.5, 0), x_dir=(0, 0, 1), z_dir=(0, 1, 0))) as redondeo1_piece_18b_section:
        with BuildLine():
            CenterArc((REDONDEO1_R, -REDONDEO1_R), REDONDEO1_R, 90, 90)
            Line((0, -REDONDEO1_R), (-REDONDEO1_R * 0.02, -REDONDEO1_R))
            Line((-REDONDEO1_R * 0.02, -REDONDEO1_R), (-REDONDEO1_R * 0.02, REDONDEO1_R * 0.02))
            Line((-REDONDEO1_R * 0.02, REDONDEO1_R * 0.02), (REDONDEO1_R, REDONDEO1_R * 0.02))
            Line((REDONDEO1_R, REDONDEO1_R * 0.02), (REDONDEO1_R, 0))
        make_face()
    redondeo1_piece_18b = extrude(amount=15, mode=Mode.PRIVATE)
    redondeo1_piece_18b = split(redondeo1_piece_18b, bisect_by=Plane(origin=(23.773604886, -20, 0.226395114), z_dir=(0, -1, 0)), keep=Keep.TOP, mode=Mode.PRIVATE)
    redondeo1_piece_18 = redondeo1_piece_18a & redondeo1_piece_18b
    add(redondeo1_piece_18, mode=Mode.SUBTRACT)
    with BuildSketch(Plane(origin=(24, -12.496880847, -0.124844042), x_dir=(-1, 0, 0), z_dir=(0, 0.9987523388778446, 0.049937616943892635))) as redondeo1_piece_19a_section:
        with BuildLine():
            CenterArc((REDONDEO1_R, REDONDEO1_R), REDONDEO1_R, 180, 90)
            Line((0, REDONDEO1_R), (-REDONDEO1_R * 0.02, REDONDEO1_R))
            Line((-REDONDEO1_R * 0.02, REDONDEO1_R), (-REDONDEO1_R * 0.02, -REDONDEO1_R * 0.02))
            Line((-REDONDEO1_R * 0.02, -REDONDEO1_R * 0.02), (REDONDEO1_R, -REDONDEO1_R * 0.02))
            Line((REDONDEO1_R, -REDONDEO1_R * 0.02), (REDONDEO1_R, 0))
        make_face()
    redondeo1_piece_19a = extrude(amount=25.024984395, mode=Mode.PRIVATE)
    redondeo1_piece_19a = split(redondeo1_piece_19a, bisect_by=Plane(origin=(23.594544585, -11.473288765, 0), z_dir=(0, 0, -1)), keep=Keep.TOP, mode=Mode.PRIVATE)
    with BuildSketch(Plane(origin=(24, -20, 0), x_dir=(0, 0, 1), z_dir=(0, 1, 0))) as redondeo1_piece_19b_section:
        with BuildLine():
            CenterArc((REDONDEO1_R, -REDONDEO1_R), REDONDEO1_R, 90, 90)
            Line((0, -REDONDEO1_R), (-REDONDEO1_R * 0.02, -REDONDEO1_R))
            Line((-REDONDEO1_R * 0.02, -REDONDEO1_R), (-REDONDEO1_R * 0.02, REDONDEO1_R * 0.02))
            Line((-REDONDEO1_R * 0.02, REDONDEO1_R * 0.02), (REDONDEO1_R, REDONDEO1_R * 0.02))
            Line((REDONDEO1_R, REDONDEO1_R * 0.02), (REDONDEO1_R, 0))
        make_face()
    redondeo1_piece_19b = extrude(amount=12.5, mode=Mode.PRIVATE)
    redondeo1_piece_19b = split(redondeo1_piece_19b, bisect_by=Plane(origin=(23.594544585, -8.528549401, 0.07357253), z_dir=(0, 0.049937616943892635, -0.9987523388778446)), keep=Keep.TOP, mode=Mode.PRIVATE)
    redondeo1_piece_19 = redondeo1_piece_19a & redondeo1_piece_19b
    add(redondeo1_piece_19, mode=Mode.SUBTRACT)
    with BuildSketch(Plane(origin=(24, -12.496880847, -0.124844042), x_dir=(-1, 0, 0), z_dir=(0, 0.9987523388778446, 0.049937616943892635))) as redondeo1_piece_20a_section:
        with BuildLine():
            CenterArc((REDONDEO1_R, REDONDEO1_R), REDONDEO1_R, 180, 90)
            Line((0, REDONDEO1_R), (-REDONDEO1_R * 0.02, REDONDEO1_R))
            Line((-REDONDEO1_R * 0.02, REDONDEO1_R), (-REDONDEO1_R * 0.02, -REDONDEO1_R * 0.02))
            Line((-REDONDEO1_R * 0.02, -REDONDEO1_R * 0.02), (REDONDEO1_R, -REDONDEO1_R * 0.02))
            Line((REDONDEO1_R, -REDONDEO1_R * 0.02), (REDONDEO1_R, 0))
        make_face()
    redondeo1_piece_20a = extrude(amount=25.024984395, mode=Mode.PRIVATE)
    redondeo1_piece_20a = split(redondeo1_piece_20a, bisect_by=Plane(origin=(23.773053254, 10, 1.287883551), z_dir=(0, 1, 0)), keep=Keep.TOP, mode=Mode.PRIVATE)
    with BuildSketch(Plane(origin=(24, 10, -1.5), x_dir=(-1, 0, 0), z_dir=(0, 0, 1))) as redondeo1_piece_20b_section:
        with BuildLine():
            CenterArc((REDONDEO1_R, REDONDEO1_R), REDONDEO1_R, 180, 90)
            Line((0, REDONDEO1_R), (-REDONDEO1_R * 0.02, REDONDEO1_R))
            Line((-REDONDEO1_R * 0.02, REDONDEO1_R), (-REDONDEO1_R * 0.02, -REDONDEO1_R * 0.02))
            Line((-REDONDEO1_R * 0.02, -REDONDEO1_R * 0.02), (REDONDEO1_R, -REDONDEO1_R * 0.02))
            Line((REDONDEO1_R, -REDONDEO1_R * 0.02), (REDONDEO1_R, 0))
        make_face()
    redondeo1_piece_20b = extrude(amount=25.5, mode=Mode.PRIVATE)
    redondeo1_piece_20b = split(redondeo1_piece_20b, bisect_by=Plane(origin=(23.773053254, 9.71247563, 0.985623782), z_dir=(0, 0.049937616943892635, -0.9987523388778446)), keep=Keep.TOP, mode=Mode.PRIVATE)
    redondeo1_piece_20 = redondeo1_piece_20a & redondeo1_piece_20b
    add(redondeo1_piece_20, mode=Mode.SUBTRACT)
    with BuildSketch(Plane(origin=(7, -33.3, 24), x_dir=(-1, 0, 0), z_dir=(0, 1, 0))) as redondeo1_piece_21a_section:
        with BuildLine():
            CenterArc((REDONDEO1_R, -REDONDEO1_R), REDONDEO1_R, 90, 90)
            Line((0, -REDONDEO1_R), (-REDONDEO1_R * 0.02, -REDONDEO1_R))
            Line((-REDONDEO1_R * 0.02, -REDONDEO1_R), (-REDONDEO1_R * 0.02, REDONDEO1_R * 0.02))
            Line((-REDONDEO1_R * 0.02, REDONDEO1_R * 0.02), (REDONDEO1_R, REDONDEO1_R * 0.02))
            Line((REDONDEO1_R, REDONDEO1_R * 0.02), (REDONDEO1_R, 0))
        make_face()
    redondeo1_piece_21a = extrude(amount=25.8, mode=Mode.PRIVATE)
    redondeo1_piece_21a = split(redondeo1_piece_21a, bisect_by=Plane(origin=(6.773604886, -10, 23.773604886), z_dir=(0, 1, 0)), keep=Keep.TOP, mode=Mode.PRIVATE)
    with BuildSketch(Plane(origin=(4.5, -10, 24), x_dir=(0, 1, 0), z_dir=(1, 0, 0))) as redondeo1_piece_21b_section:
        with BuildLine():
            CenterArc((REDONDEO1_R, -REDONDEO1_R), REDONDEO1_R, 90, 90)
            Line((0, -REDONDEO1_R), (-REDONDEO1_R * 0.02, -REDONDEO1_R))
            Line((-REDONDEO1_R * 0.02, -REDONDEO1_R), (-REDONDEO1_R * 0.02, REDONDEO1_R * 0.02))
            Line((-REDONDEO1_R * 0.02, REDONDEO1_R * 0.02), (REDONDEO1_R, REDONDEO1_R * 0.02))
            Line((REDONDEO1_R, REDONDEO1_R * 0.02), (REDONDEO1_R, 0))
        make_face()
    redondeo1_piece_21b = extrude(amount=16.5, mode=Mode.PRIVATE)
    redondeo1_piece_21b = split(redondeo1_piece_21b, bisect_by=Plane(origin=(7, -9.773604886, 23.773604886), z_dir=(-1, 0, 0)), keep=Keep.TOP, mode=Mode.PRIVATE)
    redondeo1_piece_21 = redondeo1_piece_21a & redondeo1_piece_21b
    add(redondeo1_piece_21, mode=Mode.SUBTRACT)
    with BuildSketch(Plane(origin=(0, -33.3, -7), x_dir=(0, 1, 0), z_dir=(0, 0, 1))) as redondeo1_piece_22a_section:
        with BuildLine():
            CenterArc((REDONDEO1_R, REDONDEO1_R), REDONDEO1_R, 180, 90)
            Line((0, REDONDEO1_R), (-REDONDEO1_R * 0.02, REDONDEO1_R))
            Line((-REDONDEO1_R * 0.02, REDONDEO1_R), (-REDONDEO1_R * 0.02, -REDONDEO1_R * 0.02))
            Line((-REDONDEO1_R * 0.02, -REDONDEO1_R * 0.02), (REDONDEO1_R, -REDONDEO1_R * 0.02))
            Line((REDONDEO1_R, -REDONDEO1_R * 0.02), (REDONDEO1_R, 0))
        make_face()
    redondeo1_piece_22a = extrude(amount=9.5, mode=Mode.PRIVATE)
    redondeo1_piece_22a = split(redondeo1_piece_22a, bisect_by=Plane(origin=(-0.226395114, -33.073604886, 0), z_dir=(0, 0, 1)), keep=Keep.TOP, mode=Mode.PRIVATE)
    with BuildSketch(Plane(origin=(0, -30.8, 0), x_dir=(0, 0, 1), z_dir=(0, -1, 0))) as redondeo1_piece_22b_section:
        with BuildLine():
            CenterArc((REDONDEO1_R, REDONDEO1_R), REDONDEO1_R, 180, 90)
            Line((0, REDONDEO1_R), (-REDONDEO1_R * 0.02, REDONDEO1_R))
            Line((-REDONDEO1_R * 0.02, REDONDEO1_R), (-REDONDEO1_R * 0.02, -REDONDEO1_R * 0.02))
            Line((-REDONDEO1_R * 0.02, -REDONDEO1_R * 0.02), (REDONDEO1_R, -REDONDEO1_R * 0.02))
            Line((REDONDEO1_R, -REDONDEO1_R * 0.02), (REDONDEO1_R, 0))
        make_face()
    redondeo1_piece_22b = extrude(amount=13.5, mode=Mode.PRIVATE)
    redondeo1_piece_22b = split(redondeo1_piece_22b, bisect_by=Plane(origin=(-0.226395114, -33.3, 0.226395114), z_dir=(0, 1, 0)), keep=Keep.TOP, mode=Mode.PRIVATE)
    redondeo1_piece_22 = redondeo1_piece_22a & redondeo1_piece_22b
    add(redondeo1_piece_22, mode=Mode.SUBTRACT)
    with BuildSketch(Plane(origin=(0, -33.3, 0), x_dir=(0, 0, 1), z_dir=(0, -1, 0))) as redondeo1_piece_23a_section:
        with BuildLine():
            CenterArc((REDONDEO1_R, REDONDEO1_R), REDONDEO1_R, 180, 90)
            Line((0, REDONDEO1_R), (-REDONDEO1_R * 0.02, REDONDEO1_R))
            Line((-REDONDEO1_R * 0.02, REDONDEO1_R), (-REDONDEO1_R * 0.02, -REDONDEO1_R * 0.02))
            Line((-REDONDEO1_R * 0.02, -REDONDEO1_R * 0.02), (REDONDEO1_R, -REDONDEO1_R * 0.02))
            Line((REDONDEO1_R, -REDONDEO1_R * 0.02), (REDONDEO1_R, 0))
        make_face()
    redondeo1_piece_23a = extrude(amount=13.5, mode=Mode.PRIVATE)
    redondeo1_piece_23a = split(redondeo1_piece_23a, bisect_by=Plane(origin=(-0.226395114, -44.3, 0.226395114), z_dir=(0, -1, 0)), keep=Keep.TOP, mode=Mode.PRIVATE)
    with BuildSketch(Plane(origin=(0, -44.3, -2.5), x_dir=(0, 1, 0), z_dir=(0, 0, 1))) as redondeo1_piece_23b_section:
        with BuildLine():
            CenterArc((REDONDEO1_R, REDONDEO1_R), REDONDEO1_R, 180, 90)
            Line((0, REDONDEO1_R), (-REDONDEO1_R * 0.02, REDONDEO1_R))
            Line((-REDONDEO1_R * 0.02, REDONDEO1_R), (-REDONDEO1_R * 0.02, -REDONDEO1_R * 0.02))
            Line((-REDONDEO1_R * 0.02, -REDONDEO1_R * 0.02), (REDONDEO1_R, -REDONDEO1_R * 0.02))
            Line((REDONDEO1_R, -REDONDEO1_R * 0.02), (REDONDEO1_R, 0))
        make_face()
    redondeo1_piece_23b = extrude(amount=26.5, mode=Mode.PRIVATE)
    redondeo1_piece_23b = split(redondeo1_piece_23b, bisect_by=Plane(origin=(-0.226395114, -44.073604886, 0), z_dir=(0, 0, -1)), keep=Keep.TOP, mode=Mode.PRIVATE)
    redondeo1_piece_23 = redondeo1_piece_23a & redondeo1_piece_23b
    add(redondeo1_piece_23, mode=Mode.SUBTRACT)

    # Croquis19 → Cortar-Extruir11 (cut, through all)
    with BuildSketch(Plane(origin=(0, -44.3, 0), x_dir=(-1, 0, 0), z_dir=(0, -1, 0))):
        with Locations((-10.5, -21.5)):
            Rectangle(CROQUIS19_W, CROQUIS19_H)
    extrude(amount=-CORTAR_EXTRUIR11_DEPTH, mode=Mode.SUBTRACT)

    # Croquis21 → Cortar-Extruir12 (cut)
    with BuildSketch(Plane(origin=(0, 0, 0), x_dir=(-1, 0, 0), z_dir=(0, 0, -1))):
        with Locations((-5.52, -14.3)):
            Circle(CROQUIS21_R)
    extrude(amount=-CORTAR_EXTRUIR12_DEPTH, mode=Mode.SUBTRACT)

    # Croquis22 → Cortar-Extruir13 (cut, through all)
    with BuildSketch(Plane(origin=(0, 0, 0), x_dir=(0, 0, -1), z_dir=(1, 0, 0))):
        with Locations((-6, -38.8)):
            Rectangle(CROQUIS22_W, CROQUIS22_H)
    extrude(amount=-CORTAR_EXTRUIR13_DEPTH, mode=Mode.SUBTRACT)


solid = part_1.part
